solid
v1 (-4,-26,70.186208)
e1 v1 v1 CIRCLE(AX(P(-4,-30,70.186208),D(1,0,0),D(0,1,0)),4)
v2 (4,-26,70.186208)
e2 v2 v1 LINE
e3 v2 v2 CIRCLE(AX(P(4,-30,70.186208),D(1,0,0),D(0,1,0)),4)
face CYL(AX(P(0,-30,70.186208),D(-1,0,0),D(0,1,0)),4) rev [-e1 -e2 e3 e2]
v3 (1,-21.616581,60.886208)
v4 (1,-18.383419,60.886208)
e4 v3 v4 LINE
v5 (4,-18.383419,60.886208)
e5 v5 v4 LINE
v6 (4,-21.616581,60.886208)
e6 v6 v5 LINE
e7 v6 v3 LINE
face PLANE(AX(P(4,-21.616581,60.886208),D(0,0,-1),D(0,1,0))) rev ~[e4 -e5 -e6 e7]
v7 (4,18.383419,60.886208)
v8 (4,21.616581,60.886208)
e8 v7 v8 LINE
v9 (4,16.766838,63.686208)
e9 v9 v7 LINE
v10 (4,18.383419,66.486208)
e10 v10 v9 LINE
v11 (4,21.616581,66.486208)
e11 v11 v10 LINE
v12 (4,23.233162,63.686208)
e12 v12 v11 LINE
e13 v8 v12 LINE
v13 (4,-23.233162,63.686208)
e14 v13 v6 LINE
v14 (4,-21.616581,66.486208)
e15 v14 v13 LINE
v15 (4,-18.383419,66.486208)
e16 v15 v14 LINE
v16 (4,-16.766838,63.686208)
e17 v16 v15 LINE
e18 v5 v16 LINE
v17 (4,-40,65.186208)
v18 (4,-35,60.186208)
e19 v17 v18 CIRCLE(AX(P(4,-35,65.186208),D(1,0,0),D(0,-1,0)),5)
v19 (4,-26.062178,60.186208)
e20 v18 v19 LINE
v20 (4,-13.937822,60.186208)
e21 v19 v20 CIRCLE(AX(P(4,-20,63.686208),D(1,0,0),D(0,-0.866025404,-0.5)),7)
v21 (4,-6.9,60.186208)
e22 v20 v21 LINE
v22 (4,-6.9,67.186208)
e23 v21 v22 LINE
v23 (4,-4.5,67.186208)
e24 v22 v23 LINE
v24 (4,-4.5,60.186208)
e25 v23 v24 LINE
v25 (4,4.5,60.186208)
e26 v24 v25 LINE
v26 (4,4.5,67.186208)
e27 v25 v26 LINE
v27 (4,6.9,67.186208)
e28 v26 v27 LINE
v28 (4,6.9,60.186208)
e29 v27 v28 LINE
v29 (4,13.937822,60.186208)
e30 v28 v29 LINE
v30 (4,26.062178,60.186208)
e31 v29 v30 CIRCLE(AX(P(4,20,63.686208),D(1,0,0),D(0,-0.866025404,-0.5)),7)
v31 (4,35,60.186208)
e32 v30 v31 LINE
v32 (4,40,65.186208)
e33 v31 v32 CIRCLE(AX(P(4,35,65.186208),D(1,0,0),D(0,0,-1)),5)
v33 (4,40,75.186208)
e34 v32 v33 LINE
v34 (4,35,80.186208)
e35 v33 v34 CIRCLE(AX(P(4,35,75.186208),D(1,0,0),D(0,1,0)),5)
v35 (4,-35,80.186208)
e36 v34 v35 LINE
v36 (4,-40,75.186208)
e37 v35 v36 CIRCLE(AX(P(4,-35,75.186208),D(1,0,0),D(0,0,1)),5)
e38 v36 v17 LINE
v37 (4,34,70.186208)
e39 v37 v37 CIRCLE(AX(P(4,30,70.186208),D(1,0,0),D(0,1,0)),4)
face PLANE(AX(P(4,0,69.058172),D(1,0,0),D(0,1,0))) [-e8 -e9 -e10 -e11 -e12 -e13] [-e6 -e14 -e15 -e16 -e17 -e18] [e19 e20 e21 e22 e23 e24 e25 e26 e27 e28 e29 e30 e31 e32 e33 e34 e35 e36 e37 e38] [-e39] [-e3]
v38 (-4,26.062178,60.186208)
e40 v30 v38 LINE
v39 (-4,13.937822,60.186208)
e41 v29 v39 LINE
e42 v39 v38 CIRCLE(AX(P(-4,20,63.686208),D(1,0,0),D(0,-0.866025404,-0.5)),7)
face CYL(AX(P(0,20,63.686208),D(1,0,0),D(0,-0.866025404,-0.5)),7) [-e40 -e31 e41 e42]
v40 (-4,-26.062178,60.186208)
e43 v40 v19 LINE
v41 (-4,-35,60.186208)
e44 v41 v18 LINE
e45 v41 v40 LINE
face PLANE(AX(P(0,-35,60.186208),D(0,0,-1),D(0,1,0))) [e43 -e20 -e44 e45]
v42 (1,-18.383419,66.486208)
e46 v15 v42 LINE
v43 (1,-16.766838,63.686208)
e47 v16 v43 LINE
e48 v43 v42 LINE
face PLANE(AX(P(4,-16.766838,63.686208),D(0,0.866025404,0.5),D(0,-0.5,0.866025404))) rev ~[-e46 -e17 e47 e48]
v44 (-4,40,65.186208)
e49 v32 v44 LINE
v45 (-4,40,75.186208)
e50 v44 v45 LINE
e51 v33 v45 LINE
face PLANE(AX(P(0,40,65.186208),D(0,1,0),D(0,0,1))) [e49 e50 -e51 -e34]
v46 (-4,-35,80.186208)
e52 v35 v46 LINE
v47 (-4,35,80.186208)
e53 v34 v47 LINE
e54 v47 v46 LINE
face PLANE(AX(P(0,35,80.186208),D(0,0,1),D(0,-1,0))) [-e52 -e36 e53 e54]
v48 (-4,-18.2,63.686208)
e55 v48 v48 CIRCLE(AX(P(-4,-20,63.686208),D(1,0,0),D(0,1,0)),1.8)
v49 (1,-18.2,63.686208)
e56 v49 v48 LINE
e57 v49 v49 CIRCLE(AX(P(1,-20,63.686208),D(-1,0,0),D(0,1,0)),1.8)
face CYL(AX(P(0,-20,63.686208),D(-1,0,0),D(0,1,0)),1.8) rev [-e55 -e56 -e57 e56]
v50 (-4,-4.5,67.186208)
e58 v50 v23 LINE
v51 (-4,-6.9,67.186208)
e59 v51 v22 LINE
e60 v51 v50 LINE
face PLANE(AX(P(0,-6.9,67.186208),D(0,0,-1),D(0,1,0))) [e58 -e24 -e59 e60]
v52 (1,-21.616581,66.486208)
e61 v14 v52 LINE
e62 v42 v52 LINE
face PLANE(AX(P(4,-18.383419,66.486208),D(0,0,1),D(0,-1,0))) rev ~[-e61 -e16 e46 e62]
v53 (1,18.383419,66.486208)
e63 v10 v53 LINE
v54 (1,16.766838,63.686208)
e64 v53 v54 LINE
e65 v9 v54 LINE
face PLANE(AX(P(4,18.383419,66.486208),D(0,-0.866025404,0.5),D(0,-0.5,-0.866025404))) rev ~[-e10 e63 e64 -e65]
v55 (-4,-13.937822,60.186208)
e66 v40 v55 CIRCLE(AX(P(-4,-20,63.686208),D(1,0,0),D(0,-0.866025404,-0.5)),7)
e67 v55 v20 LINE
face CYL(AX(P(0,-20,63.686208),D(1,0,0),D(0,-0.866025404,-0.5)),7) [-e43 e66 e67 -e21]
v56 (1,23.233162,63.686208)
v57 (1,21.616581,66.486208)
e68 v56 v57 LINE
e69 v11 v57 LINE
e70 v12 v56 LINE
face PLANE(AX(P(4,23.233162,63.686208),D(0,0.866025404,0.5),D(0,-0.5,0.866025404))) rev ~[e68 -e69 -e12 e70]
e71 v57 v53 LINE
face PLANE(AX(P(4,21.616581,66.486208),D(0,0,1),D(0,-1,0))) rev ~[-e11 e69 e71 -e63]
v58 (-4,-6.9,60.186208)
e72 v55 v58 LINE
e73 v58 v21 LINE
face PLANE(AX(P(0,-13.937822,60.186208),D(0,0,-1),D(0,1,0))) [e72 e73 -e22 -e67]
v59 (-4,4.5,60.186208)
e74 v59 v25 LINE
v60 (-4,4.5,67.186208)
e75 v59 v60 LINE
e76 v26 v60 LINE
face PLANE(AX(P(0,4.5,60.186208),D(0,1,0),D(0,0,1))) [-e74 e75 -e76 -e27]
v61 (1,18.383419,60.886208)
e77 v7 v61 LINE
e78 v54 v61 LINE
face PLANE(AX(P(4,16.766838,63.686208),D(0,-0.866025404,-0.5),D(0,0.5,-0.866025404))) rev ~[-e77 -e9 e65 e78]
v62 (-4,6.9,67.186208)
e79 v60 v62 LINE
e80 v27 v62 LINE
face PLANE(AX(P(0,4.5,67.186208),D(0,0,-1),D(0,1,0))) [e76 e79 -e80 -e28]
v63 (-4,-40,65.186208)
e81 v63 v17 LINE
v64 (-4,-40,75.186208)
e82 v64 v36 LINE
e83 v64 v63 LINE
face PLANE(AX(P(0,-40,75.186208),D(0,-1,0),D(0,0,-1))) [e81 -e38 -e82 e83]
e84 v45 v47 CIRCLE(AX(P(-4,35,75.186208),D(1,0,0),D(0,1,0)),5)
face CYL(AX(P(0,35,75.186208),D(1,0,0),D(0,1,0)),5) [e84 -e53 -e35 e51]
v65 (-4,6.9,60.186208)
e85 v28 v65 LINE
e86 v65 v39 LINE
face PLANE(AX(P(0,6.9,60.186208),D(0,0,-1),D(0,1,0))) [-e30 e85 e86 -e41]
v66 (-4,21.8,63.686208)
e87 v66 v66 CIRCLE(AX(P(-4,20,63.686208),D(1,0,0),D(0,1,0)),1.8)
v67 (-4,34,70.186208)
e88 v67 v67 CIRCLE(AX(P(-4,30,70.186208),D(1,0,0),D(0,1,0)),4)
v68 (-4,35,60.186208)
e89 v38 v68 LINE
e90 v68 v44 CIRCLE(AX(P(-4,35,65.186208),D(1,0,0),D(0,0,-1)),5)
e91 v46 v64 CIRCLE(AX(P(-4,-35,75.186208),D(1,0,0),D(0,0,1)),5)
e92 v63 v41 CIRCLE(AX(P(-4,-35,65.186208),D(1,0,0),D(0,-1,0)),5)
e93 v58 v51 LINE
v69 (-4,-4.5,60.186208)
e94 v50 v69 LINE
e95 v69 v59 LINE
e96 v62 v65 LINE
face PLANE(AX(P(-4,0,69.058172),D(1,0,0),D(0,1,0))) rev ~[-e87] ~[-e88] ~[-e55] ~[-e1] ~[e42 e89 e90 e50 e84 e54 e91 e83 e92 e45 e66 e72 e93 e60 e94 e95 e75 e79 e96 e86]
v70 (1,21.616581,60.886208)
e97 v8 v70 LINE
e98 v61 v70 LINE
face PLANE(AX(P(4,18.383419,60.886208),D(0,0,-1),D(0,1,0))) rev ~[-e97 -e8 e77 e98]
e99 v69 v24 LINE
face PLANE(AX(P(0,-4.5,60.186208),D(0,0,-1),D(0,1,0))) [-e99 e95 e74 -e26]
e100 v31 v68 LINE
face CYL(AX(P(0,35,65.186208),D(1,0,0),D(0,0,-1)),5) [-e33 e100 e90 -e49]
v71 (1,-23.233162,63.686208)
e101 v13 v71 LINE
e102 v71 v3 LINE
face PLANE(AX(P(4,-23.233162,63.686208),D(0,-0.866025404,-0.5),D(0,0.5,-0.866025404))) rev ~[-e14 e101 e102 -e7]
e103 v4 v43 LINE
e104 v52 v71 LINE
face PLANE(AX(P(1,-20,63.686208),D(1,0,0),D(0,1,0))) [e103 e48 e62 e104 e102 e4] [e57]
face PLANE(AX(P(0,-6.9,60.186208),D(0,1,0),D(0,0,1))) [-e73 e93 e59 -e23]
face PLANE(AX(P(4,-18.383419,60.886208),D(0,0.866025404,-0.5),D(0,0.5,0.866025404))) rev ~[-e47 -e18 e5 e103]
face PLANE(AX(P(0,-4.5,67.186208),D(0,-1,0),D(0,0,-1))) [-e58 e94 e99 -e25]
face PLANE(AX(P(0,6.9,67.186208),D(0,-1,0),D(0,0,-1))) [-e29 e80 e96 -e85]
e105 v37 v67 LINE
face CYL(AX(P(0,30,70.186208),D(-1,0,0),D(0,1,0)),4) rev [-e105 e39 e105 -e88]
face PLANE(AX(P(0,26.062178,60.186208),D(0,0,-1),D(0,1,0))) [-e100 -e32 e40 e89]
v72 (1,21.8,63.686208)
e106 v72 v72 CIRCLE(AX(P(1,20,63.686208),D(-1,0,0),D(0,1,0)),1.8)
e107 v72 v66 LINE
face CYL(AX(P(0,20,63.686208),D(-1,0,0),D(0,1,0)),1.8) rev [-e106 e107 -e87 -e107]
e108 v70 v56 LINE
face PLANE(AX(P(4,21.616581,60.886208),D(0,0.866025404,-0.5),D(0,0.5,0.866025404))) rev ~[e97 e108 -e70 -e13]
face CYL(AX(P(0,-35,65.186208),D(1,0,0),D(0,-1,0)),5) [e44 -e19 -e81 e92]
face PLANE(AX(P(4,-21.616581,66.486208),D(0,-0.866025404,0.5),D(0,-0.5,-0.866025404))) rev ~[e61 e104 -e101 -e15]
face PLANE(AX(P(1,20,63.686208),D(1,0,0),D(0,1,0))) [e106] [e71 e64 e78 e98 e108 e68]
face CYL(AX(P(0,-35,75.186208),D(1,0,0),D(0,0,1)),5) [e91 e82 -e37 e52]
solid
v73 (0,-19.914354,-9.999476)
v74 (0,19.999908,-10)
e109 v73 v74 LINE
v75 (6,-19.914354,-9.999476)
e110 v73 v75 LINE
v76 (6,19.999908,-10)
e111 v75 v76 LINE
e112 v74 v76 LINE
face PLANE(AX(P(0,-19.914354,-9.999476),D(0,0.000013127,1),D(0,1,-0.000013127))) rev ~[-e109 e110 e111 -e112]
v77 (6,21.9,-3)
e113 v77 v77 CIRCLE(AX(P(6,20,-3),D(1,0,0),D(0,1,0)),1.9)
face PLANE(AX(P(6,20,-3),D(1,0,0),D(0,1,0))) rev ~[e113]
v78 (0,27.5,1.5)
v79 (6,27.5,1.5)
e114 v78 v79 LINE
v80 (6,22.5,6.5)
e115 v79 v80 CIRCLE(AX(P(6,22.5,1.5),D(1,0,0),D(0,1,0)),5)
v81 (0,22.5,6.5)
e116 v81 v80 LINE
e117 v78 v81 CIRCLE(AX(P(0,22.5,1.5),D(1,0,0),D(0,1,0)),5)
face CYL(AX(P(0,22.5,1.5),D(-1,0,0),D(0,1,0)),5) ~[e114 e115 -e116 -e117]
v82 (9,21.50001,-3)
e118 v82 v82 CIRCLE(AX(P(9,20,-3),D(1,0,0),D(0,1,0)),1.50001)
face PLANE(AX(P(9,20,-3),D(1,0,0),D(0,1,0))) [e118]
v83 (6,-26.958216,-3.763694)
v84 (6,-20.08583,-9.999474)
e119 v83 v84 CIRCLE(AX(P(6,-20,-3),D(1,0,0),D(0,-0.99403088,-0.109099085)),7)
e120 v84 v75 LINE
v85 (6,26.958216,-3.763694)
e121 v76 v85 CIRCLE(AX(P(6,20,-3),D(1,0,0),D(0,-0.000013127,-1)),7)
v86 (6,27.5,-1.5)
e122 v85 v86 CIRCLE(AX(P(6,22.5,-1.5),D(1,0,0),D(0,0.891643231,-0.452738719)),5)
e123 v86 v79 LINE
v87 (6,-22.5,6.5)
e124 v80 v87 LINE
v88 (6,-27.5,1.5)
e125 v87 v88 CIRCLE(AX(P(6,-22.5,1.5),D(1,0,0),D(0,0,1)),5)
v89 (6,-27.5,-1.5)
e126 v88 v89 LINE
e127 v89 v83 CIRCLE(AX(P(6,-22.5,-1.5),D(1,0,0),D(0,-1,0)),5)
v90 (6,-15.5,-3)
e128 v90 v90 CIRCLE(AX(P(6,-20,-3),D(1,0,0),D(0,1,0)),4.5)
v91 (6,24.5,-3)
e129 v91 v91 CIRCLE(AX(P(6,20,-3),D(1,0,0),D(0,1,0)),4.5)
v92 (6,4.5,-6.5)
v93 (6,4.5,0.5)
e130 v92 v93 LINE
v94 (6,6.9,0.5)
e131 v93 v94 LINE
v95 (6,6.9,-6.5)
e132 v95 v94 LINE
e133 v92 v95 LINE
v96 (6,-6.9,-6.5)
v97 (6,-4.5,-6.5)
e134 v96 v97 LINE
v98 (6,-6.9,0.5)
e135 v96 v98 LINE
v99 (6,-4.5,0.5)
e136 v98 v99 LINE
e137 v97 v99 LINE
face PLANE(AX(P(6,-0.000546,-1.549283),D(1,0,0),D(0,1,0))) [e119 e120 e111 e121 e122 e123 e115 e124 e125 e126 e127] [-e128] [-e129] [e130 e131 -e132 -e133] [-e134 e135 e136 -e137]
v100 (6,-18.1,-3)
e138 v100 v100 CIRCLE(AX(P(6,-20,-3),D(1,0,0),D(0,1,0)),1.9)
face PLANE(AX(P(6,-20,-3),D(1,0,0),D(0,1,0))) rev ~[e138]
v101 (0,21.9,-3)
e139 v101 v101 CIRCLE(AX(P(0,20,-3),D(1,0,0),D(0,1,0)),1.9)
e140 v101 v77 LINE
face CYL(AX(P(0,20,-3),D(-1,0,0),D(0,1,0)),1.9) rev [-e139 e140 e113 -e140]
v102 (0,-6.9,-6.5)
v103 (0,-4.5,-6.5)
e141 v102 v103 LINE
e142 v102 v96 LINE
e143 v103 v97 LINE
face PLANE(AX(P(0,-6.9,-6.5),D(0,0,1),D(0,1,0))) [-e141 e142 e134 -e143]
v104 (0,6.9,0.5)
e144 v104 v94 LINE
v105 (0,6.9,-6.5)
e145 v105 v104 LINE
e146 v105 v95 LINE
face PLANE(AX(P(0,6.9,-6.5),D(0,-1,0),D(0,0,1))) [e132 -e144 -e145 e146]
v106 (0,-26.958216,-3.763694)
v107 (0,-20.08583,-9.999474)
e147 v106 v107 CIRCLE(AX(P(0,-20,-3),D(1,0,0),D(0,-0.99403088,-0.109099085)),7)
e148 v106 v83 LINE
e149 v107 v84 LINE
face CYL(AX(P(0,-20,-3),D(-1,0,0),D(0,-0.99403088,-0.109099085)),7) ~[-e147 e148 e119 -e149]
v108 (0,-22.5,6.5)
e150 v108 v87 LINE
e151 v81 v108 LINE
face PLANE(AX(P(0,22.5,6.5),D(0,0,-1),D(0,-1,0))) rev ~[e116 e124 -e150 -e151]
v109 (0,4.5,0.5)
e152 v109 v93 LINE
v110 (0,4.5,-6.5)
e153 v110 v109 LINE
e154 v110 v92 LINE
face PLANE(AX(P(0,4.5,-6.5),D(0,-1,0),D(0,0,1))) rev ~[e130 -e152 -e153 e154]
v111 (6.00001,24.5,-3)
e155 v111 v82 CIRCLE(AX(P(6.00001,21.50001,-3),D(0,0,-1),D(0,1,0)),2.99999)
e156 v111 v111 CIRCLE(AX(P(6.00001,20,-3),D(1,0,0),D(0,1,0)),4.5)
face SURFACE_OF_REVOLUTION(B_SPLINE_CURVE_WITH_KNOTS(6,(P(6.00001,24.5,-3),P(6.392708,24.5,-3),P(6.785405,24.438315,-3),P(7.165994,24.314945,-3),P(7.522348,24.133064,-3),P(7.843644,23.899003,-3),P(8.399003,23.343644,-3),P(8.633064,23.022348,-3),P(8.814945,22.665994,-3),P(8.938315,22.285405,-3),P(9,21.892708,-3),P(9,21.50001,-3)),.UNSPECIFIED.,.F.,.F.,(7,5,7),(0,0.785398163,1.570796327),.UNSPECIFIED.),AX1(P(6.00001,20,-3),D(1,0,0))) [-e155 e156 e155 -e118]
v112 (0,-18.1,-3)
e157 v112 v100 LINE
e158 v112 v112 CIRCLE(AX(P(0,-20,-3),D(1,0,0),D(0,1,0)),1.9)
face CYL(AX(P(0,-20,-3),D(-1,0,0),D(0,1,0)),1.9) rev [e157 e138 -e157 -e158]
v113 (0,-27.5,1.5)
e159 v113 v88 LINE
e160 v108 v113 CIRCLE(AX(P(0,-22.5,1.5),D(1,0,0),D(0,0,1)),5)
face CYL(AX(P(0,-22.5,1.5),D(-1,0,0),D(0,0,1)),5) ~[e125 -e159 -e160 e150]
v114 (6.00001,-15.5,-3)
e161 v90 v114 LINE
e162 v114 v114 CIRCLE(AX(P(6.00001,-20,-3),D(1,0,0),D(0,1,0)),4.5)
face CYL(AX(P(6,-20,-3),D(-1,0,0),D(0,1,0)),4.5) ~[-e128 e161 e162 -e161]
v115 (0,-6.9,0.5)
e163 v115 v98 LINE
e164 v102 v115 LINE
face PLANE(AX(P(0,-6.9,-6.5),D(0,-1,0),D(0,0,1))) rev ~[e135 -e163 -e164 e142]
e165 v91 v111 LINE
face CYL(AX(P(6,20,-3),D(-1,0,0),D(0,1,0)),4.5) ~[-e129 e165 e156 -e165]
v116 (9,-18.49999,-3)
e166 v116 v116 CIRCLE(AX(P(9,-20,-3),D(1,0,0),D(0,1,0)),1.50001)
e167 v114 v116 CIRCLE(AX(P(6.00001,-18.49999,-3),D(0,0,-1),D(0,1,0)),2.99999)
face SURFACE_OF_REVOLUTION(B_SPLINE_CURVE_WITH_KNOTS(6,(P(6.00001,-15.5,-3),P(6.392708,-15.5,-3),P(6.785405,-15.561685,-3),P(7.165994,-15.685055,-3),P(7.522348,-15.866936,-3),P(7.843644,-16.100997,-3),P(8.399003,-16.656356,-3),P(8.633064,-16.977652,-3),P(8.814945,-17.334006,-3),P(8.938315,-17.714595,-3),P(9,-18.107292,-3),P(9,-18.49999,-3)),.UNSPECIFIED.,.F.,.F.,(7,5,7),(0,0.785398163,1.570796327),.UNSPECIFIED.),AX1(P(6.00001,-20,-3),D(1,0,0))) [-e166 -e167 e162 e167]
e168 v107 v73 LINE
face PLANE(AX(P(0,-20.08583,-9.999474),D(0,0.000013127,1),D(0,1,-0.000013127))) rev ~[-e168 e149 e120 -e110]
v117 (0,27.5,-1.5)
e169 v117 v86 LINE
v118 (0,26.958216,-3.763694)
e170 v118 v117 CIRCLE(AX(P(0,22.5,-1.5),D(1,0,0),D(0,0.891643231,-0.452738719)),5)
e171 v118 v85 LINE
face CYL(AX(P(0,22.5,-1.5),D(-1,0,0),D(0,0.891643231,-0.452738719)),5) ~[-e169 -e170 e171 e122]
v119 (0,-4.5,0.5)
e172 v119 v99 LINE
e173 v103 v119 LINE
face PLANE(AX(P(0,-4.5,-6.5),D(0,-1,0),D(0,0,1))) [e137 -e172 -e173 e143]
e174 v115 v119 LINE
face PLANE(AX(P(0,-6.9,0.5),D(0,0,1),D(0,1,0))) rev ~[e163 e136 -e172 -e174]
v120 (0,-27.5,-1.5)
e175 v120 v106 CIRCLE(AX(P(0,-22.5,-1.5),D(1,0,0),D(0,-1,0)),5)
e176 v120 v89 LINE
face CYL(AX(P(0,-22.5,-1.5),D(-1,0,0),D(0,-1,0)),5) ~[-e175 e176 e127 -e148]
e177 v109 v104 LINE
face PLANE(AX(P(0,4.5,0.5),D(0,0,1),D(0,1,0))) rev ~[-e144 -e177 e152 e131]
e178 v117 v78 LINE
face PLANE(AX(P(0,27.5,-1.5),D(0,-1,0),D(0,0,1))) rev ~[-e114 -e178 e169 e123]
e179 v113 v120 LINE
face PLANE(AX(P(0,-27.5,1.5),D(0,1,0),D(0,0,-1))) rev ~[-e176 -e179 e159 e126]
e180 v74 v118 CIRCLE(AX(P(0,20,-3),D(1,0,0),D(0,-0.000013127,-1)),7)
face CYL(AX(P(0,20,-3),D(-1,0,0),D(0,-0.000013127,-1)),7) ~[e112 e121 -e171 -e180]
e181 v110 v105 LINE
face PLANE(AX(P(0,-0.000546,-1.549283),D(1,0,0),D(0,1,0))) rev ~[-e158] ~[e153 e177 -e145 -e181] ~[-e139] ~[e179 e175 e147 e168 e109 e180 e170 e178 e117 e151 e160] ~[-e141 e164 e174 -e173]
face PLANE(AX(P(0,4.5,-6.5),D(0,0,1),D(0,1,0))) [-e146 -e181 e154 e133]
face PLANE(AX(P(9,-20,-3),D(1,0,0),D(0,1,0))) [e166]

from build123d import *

# Parameters (mm, degrees)
F0_R      = 5
F0_R_2    = 4
F1_DEPTH  = 4
F2_R      = 1.4
F3_DEPTH  = 13
F4_R      = 1.8
F4_R_2    = 4
F5_DEPTH  = 4
F7_DEPTH  = 3
F8_R      = 1.9
F8_W      = 2.4
F8_H      = 7
F9_DEPTH  = 6
F11_R     = 4.5
F12_DEPTH = 3
F13_R     = 2.99999


# Not quite as in the source:
# - a fillet or chamfer is up to 0.001 mm smaller than in the source, because OpenCascade refuses the exact size


with BuildPart() as f1:
    # F0 (on Right) → F1 (new body, symmetric)
    with BuildSketch(Plane.YZ):
        with BuildLine():
            Line((-11, 25), (-35, 25))
            ThreePointArc((-35, 25), (-38.5355339059, 23.5355339059), (-40, 20))
            Line((-40, 20), (-40, -25))
            Line((-40, -25), (40, -25))
            Line((40, -25), (40, 20))
            ThreePointArc((40, 20), (38.5355339059, 23.5355339059), (35, 25))
            Line((35, 25), (11, 25))
            Line((11, 25), (11, 10))
            ThreePointArc((11, 10), (10.4142135624, 8.5857864376), (9, 8))
            Line((9, 8), (-9, 8))
            ThreePointArc((-9, 8), (-10.4142135624, 8.5857864376), (-11, 10))
            Line((-11, 10), (-11, 25))
        make_face()
        with Locations((-30, -13)):
            Circle(F0_R, mode=Mode.SUBTRACT)
        with Locations((30, -13)):
            Circle(F0_R, mode=Mode.SUBTRACT)
        with Locations((-30, 13)):
            Circle(F0_R_2, mode=Mode.SUBTRACT)
        with Locations((30, 13)):
            Circle(F0_R_2, mode=Mode.SUBTRACT)
    extrude(amount=F1_DEPTH, both=True)

    # F2 (on face) → F3 (cut)
    with BuildSketch(Plane.XY.offset(25)):
        with Locations((0, 30)):
            Circle(F2_R)
        with Locations((0, 24)):
            Circle(F2_R)
        with Locations((0, -24)):
            Circle(F2_R)
        with Locations((0, -30)):
            Circle(F2_R)
    extrude(amount=-F3_DEPTH, mode=Mode.SUBTRACT)


with BuildPart() as f5:
    # F4 (on Right) → F5 (new body, symmetric)
    with BuildSketch(Plane.YZ):
        with BuildLine():
            Line((-11, 80.1862078905), (-35, 80.1862078905))
            ThreePointArc((-35, 80.1862078905), (-38.5355339059, 78.7217417964), (-40, 75.1862078905))
            Line((-40, 75.1862078905), (-40, 65.1862078905))
            ThreePointArc((-40, 65.1862078905), (-38.5355339059, 61.6506739846), (-35, 60.1862078905))
            Line((-35, 60.1862078905), (-26.0621778265, 60.1862078905))
            ThreePointArc((-26.0621778265, 60.1862078905), (-20, 56.6862078905), (-13.9378221735, 60.1862078905))
            Line((-13.9378221735, 60.1862078905), (-6.9, 60.1862078905))
            Line((-6.9, 60.1862078905), (-6.9, 67.1862078905))
            Line((-6.9, 67.1862078905), (-4.5, 67.1862078905))
            Line((-4.5, 67.1862078905), (-4.5, 60.1862078905))
            Line((-4.5, 60.1862078905), (4.5, 60.1862078905))
            Line((4.5, 60.1862078905), (4.5, 67.1862078905))
            Line((4.5, 67.1862078905), (6.9, 67.1862078905))
            Line((6.9, 67.1862078905), (6.9, 60.1862078905))
            Line((6.9, 60.1862078905), (13.9378221735, 60.1862078905))
            ThreePointArc((13.9378221735, 60.1862078905), (20, 56.6862078905), (26.0621778265, 60.1862078905))
            Line((26.0621778265, 60.1862078905), (35, 60.1862078905))
            ThreePointArc((35, 60.1862078905), (38.5355339059, 61.6506739846), (40, 65.1862078905))
            Line((40, 65.1862078905), (40, 75.1862078905))
            ThreePointArc((40, 75.1862078905), (38.5355339059, 78.7217417964), (35, 80.1862078905))
            Line((35, 80.1862078905), (11, 80.1862078905))
            Line((11, 80.1862078905), (-11, 80.1862078905))
        make_face()
        with Locations((-20, 63.6862078905)):
            Circle(F4_R, mode=Mode.SUBTRACT)
        with Locations((20, 63.6862078905)):
            Circle(F4_R, mode=Mode.SUBTRACT)
        with Locations((-30, 70.1862078905)):
            Circle(F4_R_2, mode=Mode.SUBTRACT)
        with Locations((30, 70.1862078905)):
            Circle(F4_R_2, mode=Mode.SUBTRACT)
    extrude(amount=F5_DEPTH, both=True)

    # F6 (on face) → F7 (cut)
    with BuildSketch(Plane.YZ.offset(4)):
        Polygon((21.6165807537, 66.4862078905), (18.3834192463, 66.4862078905), (16.7668384925, 63.6862078905), (18.3834192463, 60.8862078905), (21.6165807537, 60.8862078905), (23.2331615075, 63.6862078905), align=None)
        Polygon((-18.3834192463, 66.4862078905), (-21.6165807537, 66.4862078905), (-23.2331615075, 63.6862078905), (-21.6165807537, 60.8862078905), (-18.3834192463, 60.8862078905), (-16.7668384925, 63.6862078905), align=None)
    extrude(amount=-F7_DEPTH, mode=Mode.SUBTRACT)


with BuildPart() as f9:
    # F8 (on Right) → F9 (new body)
    with BuildSketch(Plane.YZ):
        with BuildLine():
            Line((22.5, 6.5), (-22.5, 6.5))
            ThreePointArc((-22.5, 6.5), (-26.0355339059, 5.0355339059), (-27.5, 1.5))
            Line((-27.5, 1.5), (-27.5, -1.5))
            ThreePointArc((-27.5, -1.5), (-27.3626680324, -2.6638125307), (-26.9582161573, -3.7636935955))
            ThreePointArc((-26.9582161573, -3.7636935955), (-24.7038160383, -8.1840249496), (-20.085830036, -9.9994737806))
            Line((-20.085830036, -9.9994737806), (-19.9143537329, -9.9994760316))
            Line((-19.9143537329, -9.9994760316), (19.9999081087, -9.9999999994))
            ThreePointArc((19.9999081087, -9.9999999994), (24.6719110347, -8.2127964936), (26.9582161573, -3.7636935955))
            ThreePointArc((26.9582161573, -3.7636935955), (27.3626680324, -2.6638125307), (27.5, -1.5))
            Line((27.5, -1.5), (27.5, 1.5))
            ThreePointArc((27.5, 1.5), (26.0355339059, 5.0355339059), (22.5, 6.5))
        make_face()
        with Locations((-20, -3)):
            Circle(F8_R, mode=Mode.SUBTRACT)
        with Locations((-5.7, -3)):
            Rectangle(F8_W, F8_H, mode=Mode.SUBTRACT)
        with Locations((5.7, -3)):
            Rectangle(F8_W, F8_H, mode=Mode.SUBTRACT)
        with Locations((20, -3)):
            Circle(F8_R, mode=Mode.SUBTRACT)
    extrude(amount=F9_DEPTH)

    # F11 (on face) → F12 (join)
    with BuildSketch(Plane.YZ.offset(6)):
        with Locations((-20, -3)):
            Circle(F11_R)
        with Locations((20, -3)):
            Circle(F11_R)
    extrude(amount=F12_DEPTH)

    # F13 (radius 3 in the source; OpenCascade refuses exactly that, so slightly less here)
    f13_edges = [f9.edges().sort_by_distance(p)[0] for p in [
        (9, -24.5, -3),
        (9, 15.5, -3),
    ]]
    fillet(f13_edges, radius=F13_R)


solid = Compound([f5.part, f9.part])
